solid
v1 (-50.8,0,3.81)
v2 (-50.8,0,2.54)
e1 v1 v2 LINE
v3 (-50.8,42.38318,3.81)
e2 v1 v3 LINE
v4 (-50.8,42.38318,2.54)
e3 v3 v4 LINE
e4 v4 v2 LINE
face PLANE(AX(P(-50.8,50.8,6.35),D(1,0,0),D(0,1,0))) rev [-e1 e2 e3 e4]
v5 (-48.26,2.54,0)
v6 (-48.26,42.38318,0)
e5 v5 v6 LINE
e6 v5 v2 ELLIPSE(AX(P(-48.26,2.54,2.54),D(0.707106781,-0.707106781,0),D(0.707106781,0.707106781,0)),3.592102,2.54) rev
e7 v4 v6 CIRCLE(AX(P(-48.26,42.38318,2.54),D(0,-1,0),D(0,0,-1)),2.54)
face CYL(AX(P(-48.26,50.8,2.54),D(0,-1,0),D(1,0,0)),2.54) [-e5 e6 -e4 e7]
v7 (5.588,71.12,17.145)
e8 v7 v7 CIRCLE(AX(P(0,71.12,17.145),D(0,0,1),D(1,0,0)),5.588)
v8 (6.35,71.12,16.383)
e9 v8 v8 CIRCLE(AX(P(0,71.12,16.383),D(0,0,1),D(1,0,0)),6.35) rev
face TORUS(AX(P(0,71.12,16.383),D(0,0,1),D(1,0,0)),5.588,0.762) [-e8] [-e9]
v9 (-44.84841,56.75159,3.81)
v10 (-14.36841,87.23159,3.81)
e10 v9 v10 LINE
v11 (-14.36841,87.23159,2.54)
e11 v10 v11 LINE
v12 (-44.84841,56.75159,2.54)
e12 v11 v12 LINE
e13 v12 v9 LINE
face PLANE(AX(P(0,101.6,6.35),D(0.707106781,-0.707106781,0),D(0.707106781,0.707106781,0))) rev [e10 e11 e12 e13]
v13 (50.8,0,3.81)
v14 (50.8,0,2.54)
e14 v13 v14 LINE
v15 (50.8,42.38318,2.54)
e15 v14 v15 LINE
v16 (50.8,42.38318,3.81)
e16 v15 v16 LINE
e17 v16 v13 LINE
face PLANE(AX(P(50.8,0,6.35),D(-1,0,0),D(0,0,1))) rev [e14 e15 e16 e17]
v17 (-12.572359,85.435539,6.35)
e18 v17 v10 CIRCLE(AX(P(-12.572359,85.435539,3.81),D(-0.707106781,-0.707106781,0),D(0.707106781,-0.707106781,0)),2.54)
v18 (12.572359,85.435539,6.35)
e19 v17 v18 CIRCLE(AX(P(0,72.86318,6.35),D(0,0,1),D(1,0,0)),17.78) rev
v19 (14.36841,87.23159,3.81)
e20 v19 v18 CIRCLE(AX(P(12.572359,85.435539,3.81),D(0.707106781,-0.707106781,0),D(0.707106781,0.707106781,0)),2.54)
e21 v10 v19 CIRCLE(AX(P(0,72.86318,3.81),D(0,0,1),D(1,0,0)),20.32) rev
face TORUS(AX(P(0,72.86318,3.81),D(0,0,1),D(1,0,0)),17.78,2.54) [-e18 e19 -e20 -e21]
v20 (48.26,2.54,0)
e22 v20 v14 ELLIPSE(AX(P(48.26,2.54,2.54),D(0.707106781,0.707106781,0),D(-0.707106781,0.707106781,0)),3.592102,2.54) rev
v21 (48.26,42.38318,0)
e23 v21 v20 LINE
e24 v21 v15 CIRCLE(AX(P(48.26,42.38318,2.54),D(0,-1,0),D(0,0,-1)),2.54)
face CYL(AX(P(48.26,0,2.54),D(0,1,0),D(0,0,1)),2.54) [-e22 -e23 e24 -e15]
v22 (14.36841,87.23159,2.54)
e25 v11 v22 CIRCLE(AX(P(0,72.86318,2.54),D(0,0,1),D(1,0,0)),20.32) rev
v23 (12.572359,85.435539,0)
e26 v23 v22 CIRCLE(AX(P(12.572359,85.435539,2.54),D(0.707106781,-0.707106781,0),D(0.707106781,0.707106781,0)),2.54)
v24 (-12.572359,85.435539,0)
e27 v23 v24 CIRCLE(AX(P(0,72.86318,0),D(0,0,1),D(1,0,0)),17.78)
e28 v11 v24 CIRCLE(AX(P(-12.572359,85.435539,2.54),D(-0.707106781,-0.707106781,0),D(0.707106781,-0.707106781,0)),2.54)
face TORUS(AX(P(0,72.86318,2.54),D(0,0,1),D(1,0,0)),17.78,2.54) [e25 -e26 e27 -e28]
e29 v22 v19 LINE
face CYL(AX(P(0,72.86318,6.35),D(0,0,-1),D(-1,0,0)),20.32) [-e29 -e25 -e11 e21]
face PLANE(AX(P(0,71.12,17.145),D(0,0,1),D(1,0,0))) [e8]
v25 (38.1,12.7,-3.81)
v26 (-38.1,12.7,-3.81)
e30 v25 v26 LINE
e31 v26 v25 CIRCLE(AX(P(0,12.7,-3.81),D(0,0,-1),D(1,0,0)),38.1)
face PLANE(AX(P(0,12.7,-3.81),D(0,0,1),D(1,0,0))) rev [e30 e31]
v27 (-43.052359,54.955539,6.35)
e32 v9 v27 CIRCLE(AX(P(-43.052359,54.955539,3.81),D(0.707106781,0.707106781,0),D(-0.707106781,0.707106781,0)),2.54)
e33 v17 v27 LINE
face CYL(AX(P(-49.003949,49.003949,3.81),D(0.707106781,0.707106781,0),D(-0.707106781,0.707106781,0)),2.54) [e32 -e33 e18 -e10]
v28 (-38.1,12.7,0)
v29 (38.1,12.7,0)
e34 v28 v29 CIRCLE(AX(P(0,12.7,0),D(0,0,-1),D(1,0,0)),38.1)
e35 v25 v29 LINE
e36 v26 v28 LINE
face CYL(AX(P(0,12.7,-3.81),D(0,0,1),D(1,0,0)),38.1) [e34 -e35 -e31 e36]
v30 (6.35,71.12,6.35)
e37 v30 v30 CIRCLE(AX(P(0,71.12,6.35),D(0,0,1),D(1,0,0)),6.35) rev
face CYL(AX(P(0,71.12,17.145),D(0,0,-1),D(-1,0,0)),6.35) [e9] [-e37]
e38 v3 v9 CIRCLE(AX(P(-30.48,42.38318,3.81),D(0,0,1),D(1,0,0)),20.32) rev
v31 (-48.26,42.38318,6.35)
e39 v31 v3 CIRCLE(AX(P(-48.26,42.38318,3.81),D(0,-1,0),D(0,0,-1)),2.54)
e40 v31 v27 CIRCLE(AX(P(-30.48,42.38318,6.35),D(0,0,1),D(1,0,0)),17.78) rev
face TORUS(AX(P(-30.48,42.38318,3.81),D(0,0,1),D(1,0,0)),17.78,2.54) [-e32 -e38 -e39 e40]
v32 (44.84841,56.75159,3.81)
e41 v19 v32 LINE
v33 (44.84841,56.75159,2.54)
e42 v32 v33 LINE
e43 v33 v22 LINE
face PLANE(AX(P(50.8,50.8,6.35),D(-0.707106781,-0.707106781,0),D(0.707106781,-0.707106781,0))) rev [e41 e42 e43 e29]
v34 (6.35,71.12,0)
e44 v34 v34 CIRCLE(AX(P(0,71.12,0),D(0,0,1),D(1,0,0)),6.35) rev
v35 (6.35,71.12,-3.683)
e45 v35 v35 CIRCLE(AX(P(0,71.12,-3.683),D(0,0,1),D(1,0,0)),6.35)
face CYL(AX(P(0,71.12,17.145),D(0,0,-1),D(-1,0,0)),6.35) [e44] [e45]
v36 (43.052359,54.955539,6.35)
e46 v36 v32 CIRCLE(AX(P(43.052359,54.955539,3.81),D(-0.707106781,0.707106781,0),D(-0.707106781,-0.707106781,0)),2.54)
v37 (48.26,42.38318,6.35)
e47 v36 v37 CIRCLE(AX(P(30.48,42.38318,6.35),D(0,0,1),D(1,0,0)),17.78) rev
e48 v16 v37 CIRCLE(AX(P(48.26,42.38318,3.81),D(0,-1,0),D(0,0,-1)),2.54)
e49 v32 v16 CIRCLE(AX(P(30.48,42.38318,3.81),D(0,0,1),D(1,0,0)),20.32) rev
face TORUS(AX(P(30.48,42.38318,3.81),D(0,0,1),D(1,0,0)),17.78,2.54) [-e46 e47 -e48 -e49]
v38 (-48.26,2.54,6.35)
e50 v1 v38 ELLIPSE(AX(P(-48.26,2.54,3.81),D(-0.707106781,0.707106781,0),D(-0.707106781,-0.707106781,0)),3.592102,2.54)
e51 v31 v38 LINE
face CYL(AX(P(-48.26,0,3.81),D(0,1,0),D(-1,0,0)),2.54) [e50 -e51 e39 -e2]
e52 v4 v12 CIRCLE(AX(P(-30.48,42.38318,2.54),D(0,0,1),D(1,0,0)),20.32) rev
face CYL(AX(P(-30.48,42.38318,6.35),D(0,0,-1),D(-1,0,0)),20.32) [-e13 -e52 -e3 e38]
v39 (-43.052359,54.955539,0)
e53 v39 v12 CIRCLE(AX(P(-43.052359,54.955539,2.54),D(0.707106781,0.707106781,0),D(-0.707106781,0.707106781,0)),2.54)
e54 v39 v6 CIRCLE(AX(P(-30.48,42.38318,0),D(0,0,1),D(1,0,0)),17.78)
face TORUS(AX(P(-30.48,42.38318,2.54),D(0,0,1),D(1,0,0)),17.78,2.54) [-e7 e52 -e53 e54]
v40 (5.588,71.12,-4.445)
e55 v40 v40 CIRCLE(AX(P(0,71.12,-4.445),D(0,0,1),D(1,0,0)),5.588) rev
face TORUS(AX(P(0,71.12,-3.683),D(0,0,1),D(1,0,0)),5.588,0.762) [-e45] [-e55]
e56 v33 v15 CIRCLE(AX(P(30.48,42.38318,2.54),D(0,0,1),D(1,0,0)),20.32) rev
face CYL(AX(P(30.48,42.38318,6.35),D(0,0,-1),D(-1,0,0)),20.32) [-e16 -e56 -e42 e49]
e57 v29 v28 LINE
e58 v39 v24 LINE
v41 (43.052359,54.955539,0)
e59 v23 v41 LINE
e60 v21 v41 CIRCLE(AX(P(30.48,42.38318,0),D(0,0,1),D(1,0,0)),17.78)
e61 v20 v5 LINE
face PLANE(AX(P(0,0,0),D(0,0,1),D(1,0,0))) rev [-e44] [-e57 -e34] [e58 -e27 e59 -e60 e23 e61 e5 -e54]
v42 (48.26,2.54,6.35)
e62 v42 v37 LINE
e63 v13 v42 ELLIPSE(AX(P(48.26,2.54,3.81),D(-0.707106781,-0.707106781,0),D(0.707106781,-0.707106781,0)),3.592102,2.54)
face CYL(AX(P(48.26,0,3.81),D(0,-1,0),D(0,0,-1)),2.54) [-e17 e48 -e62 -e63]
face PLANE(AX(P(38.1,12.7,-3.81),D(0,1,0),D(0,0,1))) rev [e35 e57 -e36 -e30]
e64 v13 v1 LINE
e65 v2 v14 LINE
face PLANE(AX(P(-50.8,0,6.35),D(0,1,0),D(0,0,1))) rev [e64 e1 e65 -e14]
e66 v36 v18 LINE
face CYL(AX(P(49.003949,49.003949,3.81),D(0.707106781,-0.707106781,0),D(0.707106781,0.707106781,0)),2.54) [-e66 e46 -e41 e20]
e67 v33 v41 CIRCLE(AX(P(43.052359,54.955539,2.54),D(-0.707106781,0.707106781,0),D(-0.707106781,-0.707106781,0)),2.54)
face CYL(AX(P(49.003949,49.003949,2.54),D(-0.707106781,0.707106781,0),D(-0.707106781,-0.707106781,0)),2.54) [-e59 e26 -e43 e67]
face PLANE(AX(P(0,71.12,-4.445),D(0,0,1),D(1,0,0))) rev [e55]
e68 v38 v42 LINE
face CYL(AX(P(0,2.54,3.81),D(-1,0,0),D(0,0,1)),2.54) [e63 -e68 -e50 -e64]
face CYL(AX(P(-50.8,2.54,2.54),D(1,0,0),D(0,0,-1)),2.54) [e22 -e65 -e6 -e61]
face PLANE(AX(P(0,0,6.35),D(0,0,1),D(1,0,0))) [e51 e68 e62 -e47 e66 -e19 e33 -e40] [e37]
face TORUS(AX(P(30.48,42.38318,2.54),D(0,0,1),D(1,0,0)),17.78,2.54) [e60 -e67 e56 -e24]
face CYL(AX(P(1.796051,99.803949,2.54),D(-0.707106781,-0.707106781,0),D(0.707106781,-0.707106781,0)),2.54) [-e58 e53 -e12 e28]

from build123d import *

# Parameters (mm, degrees)
BOSS_EXTRUDE1_DEPTH = 6.35
FILLET1_R           = 2.54
FILLET2_R           = 2.54
FILLET3_R           = 20.32
SKETCH3_R           = 6.35
BOSS_EXTRUDE2_DEPTH = 10.795
FILLET5_R           = 0.762
BOSS_EXTRUDE3_DEPTH = 3.81


with BuildPart() as part:
    # Sketch1 → Boss-Extrude1 (new body)
    with BuildSketch(Plane.XY):
        Polygon((-50.8, 0), (50.8, 0), (50.8, 50.8), (0, 101.6), (-50.8, 50.8), align=None)
    extrude(amount=BOSS_EXTRUDE1_DEPTH)

    # Fillet1
    fillet1_edges = [part.edges().sort_by_distance(p)[0] for p in [
        (50.8, 25.4, 6.35),
        (25.4, 76.2, 6.35),
        (-25.4, 76.2, 6.35),
        (-50.8, 25.4, 6.35),
        (0, 0, 6.35),
    ]]
    fillet(fillet1_edges, radius=FILLET1_R)

    # Fillet2
    fillet2_edges = [part.edges().sort_by_distance(p)[0] for p in [
        (-25.4, 76.2, 0),
        (25.4, 76.2, 0),
        (50.8, 25.4, 0),
        (0, 0, 0),
        (-50.8, 25.4, 0),
    ]]
    fillet(fillet2_edges, radius=FILLET2_R)

    # Fillet3
    # the kernel refuses this fillet: 20.32 mm, written as the material it takes off along each edge
    with BuildSketch(Plane(origin=(30.48, 42.383180413, 6.35), x_dir=(1, 0, 0), z_dir=(0, -1, 0))) as fillet3_piece_1:
        with BuildLine():
            CenterArc((17.78, -2.54), 2.54, 0, 90)
            Line((20.32, -2.54), (20.32, 0))
            Line((20.32, 0), (17.78, 0))
        make_face()
    revolve(axis=Axis((30.48, 42.383180413, 6.35), (0, 0, 1)), revolution_arc=45, mode=Mode.SUBTRACT)
    with BuildSketch(Plane(origin=(0, 72.863180413, 6.35), x_dir=(0.7071067811865475, 0.7071067811865477, 0), z_dir=(0.7071067811865477, -0.7071067811865475, 0))) as fillet3_piece_2:
        with BuildLine():
            CenterArc((17.78, -2.54), 2.54, 0, 90)
            Line((20.32, -2.54), (20.32, 0))
            Line((20.32, 0), (17.78, 0))
        make_face()
    revolve(axis=Axis((0, 72.863180413, 6.35), (0, 0, 1)), revolution_arc=90, mode=Mode.SUBTRACT)
    with BuildSketch(Plane(origin=(-30.48, 42.383180413, 6.35), x_dir=(-0.7071067811865475, 0.7071067811865476, 0), z_dir=(0.7071067811865476, 0.7071067811865475, 0))) as fillet3_piece_3:
        with BuildLine():
            CenterArc((17.78, -2.54), 2.54, 0, 90)
            Line((20.32, -2.54), (20.32, 0))
            Line((20.32, 0), (17.78, 0))
        make_face()
    revolve(axis=Axis((-30.48, 42.383180413, 6.35), (0, 0, 1)), revolution_arc=45, mode=Mode.SUBTRACT)
    with BuildSketch(Plane(origin=(30.48, 42.383180413, 0), x_dir=(0.7071067811865475, 0.7071067811865477, 0), z_dir=(-0.7071067811865477, 0.7071067811865475, 0))) as fillet3_piece_4:
        with BuildLine():
            CenterArc((17.78, -2.54), 2.54, 0, 90)
            Line((20.32, -2.54), (20.32, 0))
            Line((20.32, 0), (17.78, 0))
        make_face()
    revolve(axis=Axis((30.48, 42.383180413, 0), (0, 0, -1)), revolution_arc=45, mode=Mode.SUBTRACT)
    with BuildSketch(Plane(origin=(0, 72.863180413, 0), x_dir=(-0.7071067811865475, 0.7071067811865476, 0), z_dir=(-0.7071067811865476, -0.7071067811865475, 0))) as fillet3_piece_5:
        with BuildLine():
            CenterArc((17.78, -2.54), 2.54, 0, 90)
            Line((20.32, -2.54), (20.32, 0))
            Line((20.32, 0), (17.78, 0))
        make_face()
    revolve(axis=Axis((0, 72.863180413, 0), (0, 0, -1)), revolution_arc=90, mode=Mode.SUBTRACT)
    with BuildSketch(Plane(origin=(-30.48, 42.383180413, 0), x_dir=(-1, 0, 0), z_dir=(0, -1, 0))) as fillet3_piece_6:
        with BuildLine():
            CenterArc((17.78, -2.54), 2.54, 0, 90)
            Line((20.32, -2.54), (20.32, 0))
            Line((20.32, 0), (17.78, 0))
        make_face()
    revolve(axis=Axis((-30.48, 42.383180413, 0), (0, 0, -1)), revolution_arc=45, mode=Mode.SUBTRACT)
    with BuildSketch(Plane(origin=(-50.8, 50.8, 0), x_dir=(0, -1, 0), z_dir=(0, 0, 1))) as fillet3_piece_7:
        with BuildLine():
            CenterArc((FILLET3_R * 0.414213562373, FILLET3_R), FILLET3_R, 225, 45)
            Line((-FILLET3_R * 0.292893218813, FILLET3_R * 0.292893218813), (0, 0))
            Line((0, 0), (FILLET3_R * 0.414213562373, 0))
        make_face()
    extrude(amount=6.35, mode=Mode.SUBTRACT)
    with BuildSketch(Plane(origin=(50.8, 50.8, 0), x_dir=(0, -1, 0), z_dir=(0, 0, 1))) as fillet3_piece_8:
        with BuildLine():
            CenterArc((FILLET3_R * 0.414213562373, -FILLET3_R), FILLET3_R, 90, 45)
            Line((-FILLET3_R * 0.292893218813, -FILLET3_R * 0.292893218813), (0, 0))
            Line((0, 0), (FILLET3_R * 0.414213562373, 0))
        make_face()
    extrude(amount=6.35, mode=Mode.SUBTRACT)
    with BuildSketch(Plane(origin=(0, 101.6, 0), x_dir=(-0.7071067811865476, -0.7071067811865476, 0), z_dir=(0, 0, 1))) as fillet3_piece_9:
        with BuildLine():
            CenterArc((FILLET3_R, FILLET3_R), FILLET3_R, 180, 90)
            Line((0, FILLET3_R), (0, 0))
            Line((0, 0), (FILLET3_R, 0))
        make_face()
    extrude(amount=6.35, mode=Mode.SUBTRACT)

    # Sketch3 → Boss-Extrude2 (add, symmetric)
    with BuildSketch(Plane.XY.offset(6.35)):
        with Locations((0, 71.12)):
            Circle(SKETCH3_R)
    extrude(amount=BOSS_EXTRUDE2_DEPTH, both=True)

    # Fillet5
    fillet5_edges = [part.edges().sort_by_distance(p)[0] for p in [
        (-6.35, 71.12, -4.445),
        (-6.35, 71.12, 17.145),
    ]]
    fillet(fillet5_edges, radius=FILLET5_R)

    # Sketch4 → Boss-Extrude3 (add)
    with BuildSketch(Plane(origin=(0, 0, 0), x_dir=(-1, 0, 0), z_dir=(0, 0, -1))):
        with BuildLine():
            Line((-38.1, 12.7), (38.1, 12.7))
            ThreePointArc((38.1, 12.7), (0, 50.8), (-38.1, 12.7))
        make_face()
    extrude(amount=BOSS_EXTRUDE3_DEPTH)


solid = part.part
